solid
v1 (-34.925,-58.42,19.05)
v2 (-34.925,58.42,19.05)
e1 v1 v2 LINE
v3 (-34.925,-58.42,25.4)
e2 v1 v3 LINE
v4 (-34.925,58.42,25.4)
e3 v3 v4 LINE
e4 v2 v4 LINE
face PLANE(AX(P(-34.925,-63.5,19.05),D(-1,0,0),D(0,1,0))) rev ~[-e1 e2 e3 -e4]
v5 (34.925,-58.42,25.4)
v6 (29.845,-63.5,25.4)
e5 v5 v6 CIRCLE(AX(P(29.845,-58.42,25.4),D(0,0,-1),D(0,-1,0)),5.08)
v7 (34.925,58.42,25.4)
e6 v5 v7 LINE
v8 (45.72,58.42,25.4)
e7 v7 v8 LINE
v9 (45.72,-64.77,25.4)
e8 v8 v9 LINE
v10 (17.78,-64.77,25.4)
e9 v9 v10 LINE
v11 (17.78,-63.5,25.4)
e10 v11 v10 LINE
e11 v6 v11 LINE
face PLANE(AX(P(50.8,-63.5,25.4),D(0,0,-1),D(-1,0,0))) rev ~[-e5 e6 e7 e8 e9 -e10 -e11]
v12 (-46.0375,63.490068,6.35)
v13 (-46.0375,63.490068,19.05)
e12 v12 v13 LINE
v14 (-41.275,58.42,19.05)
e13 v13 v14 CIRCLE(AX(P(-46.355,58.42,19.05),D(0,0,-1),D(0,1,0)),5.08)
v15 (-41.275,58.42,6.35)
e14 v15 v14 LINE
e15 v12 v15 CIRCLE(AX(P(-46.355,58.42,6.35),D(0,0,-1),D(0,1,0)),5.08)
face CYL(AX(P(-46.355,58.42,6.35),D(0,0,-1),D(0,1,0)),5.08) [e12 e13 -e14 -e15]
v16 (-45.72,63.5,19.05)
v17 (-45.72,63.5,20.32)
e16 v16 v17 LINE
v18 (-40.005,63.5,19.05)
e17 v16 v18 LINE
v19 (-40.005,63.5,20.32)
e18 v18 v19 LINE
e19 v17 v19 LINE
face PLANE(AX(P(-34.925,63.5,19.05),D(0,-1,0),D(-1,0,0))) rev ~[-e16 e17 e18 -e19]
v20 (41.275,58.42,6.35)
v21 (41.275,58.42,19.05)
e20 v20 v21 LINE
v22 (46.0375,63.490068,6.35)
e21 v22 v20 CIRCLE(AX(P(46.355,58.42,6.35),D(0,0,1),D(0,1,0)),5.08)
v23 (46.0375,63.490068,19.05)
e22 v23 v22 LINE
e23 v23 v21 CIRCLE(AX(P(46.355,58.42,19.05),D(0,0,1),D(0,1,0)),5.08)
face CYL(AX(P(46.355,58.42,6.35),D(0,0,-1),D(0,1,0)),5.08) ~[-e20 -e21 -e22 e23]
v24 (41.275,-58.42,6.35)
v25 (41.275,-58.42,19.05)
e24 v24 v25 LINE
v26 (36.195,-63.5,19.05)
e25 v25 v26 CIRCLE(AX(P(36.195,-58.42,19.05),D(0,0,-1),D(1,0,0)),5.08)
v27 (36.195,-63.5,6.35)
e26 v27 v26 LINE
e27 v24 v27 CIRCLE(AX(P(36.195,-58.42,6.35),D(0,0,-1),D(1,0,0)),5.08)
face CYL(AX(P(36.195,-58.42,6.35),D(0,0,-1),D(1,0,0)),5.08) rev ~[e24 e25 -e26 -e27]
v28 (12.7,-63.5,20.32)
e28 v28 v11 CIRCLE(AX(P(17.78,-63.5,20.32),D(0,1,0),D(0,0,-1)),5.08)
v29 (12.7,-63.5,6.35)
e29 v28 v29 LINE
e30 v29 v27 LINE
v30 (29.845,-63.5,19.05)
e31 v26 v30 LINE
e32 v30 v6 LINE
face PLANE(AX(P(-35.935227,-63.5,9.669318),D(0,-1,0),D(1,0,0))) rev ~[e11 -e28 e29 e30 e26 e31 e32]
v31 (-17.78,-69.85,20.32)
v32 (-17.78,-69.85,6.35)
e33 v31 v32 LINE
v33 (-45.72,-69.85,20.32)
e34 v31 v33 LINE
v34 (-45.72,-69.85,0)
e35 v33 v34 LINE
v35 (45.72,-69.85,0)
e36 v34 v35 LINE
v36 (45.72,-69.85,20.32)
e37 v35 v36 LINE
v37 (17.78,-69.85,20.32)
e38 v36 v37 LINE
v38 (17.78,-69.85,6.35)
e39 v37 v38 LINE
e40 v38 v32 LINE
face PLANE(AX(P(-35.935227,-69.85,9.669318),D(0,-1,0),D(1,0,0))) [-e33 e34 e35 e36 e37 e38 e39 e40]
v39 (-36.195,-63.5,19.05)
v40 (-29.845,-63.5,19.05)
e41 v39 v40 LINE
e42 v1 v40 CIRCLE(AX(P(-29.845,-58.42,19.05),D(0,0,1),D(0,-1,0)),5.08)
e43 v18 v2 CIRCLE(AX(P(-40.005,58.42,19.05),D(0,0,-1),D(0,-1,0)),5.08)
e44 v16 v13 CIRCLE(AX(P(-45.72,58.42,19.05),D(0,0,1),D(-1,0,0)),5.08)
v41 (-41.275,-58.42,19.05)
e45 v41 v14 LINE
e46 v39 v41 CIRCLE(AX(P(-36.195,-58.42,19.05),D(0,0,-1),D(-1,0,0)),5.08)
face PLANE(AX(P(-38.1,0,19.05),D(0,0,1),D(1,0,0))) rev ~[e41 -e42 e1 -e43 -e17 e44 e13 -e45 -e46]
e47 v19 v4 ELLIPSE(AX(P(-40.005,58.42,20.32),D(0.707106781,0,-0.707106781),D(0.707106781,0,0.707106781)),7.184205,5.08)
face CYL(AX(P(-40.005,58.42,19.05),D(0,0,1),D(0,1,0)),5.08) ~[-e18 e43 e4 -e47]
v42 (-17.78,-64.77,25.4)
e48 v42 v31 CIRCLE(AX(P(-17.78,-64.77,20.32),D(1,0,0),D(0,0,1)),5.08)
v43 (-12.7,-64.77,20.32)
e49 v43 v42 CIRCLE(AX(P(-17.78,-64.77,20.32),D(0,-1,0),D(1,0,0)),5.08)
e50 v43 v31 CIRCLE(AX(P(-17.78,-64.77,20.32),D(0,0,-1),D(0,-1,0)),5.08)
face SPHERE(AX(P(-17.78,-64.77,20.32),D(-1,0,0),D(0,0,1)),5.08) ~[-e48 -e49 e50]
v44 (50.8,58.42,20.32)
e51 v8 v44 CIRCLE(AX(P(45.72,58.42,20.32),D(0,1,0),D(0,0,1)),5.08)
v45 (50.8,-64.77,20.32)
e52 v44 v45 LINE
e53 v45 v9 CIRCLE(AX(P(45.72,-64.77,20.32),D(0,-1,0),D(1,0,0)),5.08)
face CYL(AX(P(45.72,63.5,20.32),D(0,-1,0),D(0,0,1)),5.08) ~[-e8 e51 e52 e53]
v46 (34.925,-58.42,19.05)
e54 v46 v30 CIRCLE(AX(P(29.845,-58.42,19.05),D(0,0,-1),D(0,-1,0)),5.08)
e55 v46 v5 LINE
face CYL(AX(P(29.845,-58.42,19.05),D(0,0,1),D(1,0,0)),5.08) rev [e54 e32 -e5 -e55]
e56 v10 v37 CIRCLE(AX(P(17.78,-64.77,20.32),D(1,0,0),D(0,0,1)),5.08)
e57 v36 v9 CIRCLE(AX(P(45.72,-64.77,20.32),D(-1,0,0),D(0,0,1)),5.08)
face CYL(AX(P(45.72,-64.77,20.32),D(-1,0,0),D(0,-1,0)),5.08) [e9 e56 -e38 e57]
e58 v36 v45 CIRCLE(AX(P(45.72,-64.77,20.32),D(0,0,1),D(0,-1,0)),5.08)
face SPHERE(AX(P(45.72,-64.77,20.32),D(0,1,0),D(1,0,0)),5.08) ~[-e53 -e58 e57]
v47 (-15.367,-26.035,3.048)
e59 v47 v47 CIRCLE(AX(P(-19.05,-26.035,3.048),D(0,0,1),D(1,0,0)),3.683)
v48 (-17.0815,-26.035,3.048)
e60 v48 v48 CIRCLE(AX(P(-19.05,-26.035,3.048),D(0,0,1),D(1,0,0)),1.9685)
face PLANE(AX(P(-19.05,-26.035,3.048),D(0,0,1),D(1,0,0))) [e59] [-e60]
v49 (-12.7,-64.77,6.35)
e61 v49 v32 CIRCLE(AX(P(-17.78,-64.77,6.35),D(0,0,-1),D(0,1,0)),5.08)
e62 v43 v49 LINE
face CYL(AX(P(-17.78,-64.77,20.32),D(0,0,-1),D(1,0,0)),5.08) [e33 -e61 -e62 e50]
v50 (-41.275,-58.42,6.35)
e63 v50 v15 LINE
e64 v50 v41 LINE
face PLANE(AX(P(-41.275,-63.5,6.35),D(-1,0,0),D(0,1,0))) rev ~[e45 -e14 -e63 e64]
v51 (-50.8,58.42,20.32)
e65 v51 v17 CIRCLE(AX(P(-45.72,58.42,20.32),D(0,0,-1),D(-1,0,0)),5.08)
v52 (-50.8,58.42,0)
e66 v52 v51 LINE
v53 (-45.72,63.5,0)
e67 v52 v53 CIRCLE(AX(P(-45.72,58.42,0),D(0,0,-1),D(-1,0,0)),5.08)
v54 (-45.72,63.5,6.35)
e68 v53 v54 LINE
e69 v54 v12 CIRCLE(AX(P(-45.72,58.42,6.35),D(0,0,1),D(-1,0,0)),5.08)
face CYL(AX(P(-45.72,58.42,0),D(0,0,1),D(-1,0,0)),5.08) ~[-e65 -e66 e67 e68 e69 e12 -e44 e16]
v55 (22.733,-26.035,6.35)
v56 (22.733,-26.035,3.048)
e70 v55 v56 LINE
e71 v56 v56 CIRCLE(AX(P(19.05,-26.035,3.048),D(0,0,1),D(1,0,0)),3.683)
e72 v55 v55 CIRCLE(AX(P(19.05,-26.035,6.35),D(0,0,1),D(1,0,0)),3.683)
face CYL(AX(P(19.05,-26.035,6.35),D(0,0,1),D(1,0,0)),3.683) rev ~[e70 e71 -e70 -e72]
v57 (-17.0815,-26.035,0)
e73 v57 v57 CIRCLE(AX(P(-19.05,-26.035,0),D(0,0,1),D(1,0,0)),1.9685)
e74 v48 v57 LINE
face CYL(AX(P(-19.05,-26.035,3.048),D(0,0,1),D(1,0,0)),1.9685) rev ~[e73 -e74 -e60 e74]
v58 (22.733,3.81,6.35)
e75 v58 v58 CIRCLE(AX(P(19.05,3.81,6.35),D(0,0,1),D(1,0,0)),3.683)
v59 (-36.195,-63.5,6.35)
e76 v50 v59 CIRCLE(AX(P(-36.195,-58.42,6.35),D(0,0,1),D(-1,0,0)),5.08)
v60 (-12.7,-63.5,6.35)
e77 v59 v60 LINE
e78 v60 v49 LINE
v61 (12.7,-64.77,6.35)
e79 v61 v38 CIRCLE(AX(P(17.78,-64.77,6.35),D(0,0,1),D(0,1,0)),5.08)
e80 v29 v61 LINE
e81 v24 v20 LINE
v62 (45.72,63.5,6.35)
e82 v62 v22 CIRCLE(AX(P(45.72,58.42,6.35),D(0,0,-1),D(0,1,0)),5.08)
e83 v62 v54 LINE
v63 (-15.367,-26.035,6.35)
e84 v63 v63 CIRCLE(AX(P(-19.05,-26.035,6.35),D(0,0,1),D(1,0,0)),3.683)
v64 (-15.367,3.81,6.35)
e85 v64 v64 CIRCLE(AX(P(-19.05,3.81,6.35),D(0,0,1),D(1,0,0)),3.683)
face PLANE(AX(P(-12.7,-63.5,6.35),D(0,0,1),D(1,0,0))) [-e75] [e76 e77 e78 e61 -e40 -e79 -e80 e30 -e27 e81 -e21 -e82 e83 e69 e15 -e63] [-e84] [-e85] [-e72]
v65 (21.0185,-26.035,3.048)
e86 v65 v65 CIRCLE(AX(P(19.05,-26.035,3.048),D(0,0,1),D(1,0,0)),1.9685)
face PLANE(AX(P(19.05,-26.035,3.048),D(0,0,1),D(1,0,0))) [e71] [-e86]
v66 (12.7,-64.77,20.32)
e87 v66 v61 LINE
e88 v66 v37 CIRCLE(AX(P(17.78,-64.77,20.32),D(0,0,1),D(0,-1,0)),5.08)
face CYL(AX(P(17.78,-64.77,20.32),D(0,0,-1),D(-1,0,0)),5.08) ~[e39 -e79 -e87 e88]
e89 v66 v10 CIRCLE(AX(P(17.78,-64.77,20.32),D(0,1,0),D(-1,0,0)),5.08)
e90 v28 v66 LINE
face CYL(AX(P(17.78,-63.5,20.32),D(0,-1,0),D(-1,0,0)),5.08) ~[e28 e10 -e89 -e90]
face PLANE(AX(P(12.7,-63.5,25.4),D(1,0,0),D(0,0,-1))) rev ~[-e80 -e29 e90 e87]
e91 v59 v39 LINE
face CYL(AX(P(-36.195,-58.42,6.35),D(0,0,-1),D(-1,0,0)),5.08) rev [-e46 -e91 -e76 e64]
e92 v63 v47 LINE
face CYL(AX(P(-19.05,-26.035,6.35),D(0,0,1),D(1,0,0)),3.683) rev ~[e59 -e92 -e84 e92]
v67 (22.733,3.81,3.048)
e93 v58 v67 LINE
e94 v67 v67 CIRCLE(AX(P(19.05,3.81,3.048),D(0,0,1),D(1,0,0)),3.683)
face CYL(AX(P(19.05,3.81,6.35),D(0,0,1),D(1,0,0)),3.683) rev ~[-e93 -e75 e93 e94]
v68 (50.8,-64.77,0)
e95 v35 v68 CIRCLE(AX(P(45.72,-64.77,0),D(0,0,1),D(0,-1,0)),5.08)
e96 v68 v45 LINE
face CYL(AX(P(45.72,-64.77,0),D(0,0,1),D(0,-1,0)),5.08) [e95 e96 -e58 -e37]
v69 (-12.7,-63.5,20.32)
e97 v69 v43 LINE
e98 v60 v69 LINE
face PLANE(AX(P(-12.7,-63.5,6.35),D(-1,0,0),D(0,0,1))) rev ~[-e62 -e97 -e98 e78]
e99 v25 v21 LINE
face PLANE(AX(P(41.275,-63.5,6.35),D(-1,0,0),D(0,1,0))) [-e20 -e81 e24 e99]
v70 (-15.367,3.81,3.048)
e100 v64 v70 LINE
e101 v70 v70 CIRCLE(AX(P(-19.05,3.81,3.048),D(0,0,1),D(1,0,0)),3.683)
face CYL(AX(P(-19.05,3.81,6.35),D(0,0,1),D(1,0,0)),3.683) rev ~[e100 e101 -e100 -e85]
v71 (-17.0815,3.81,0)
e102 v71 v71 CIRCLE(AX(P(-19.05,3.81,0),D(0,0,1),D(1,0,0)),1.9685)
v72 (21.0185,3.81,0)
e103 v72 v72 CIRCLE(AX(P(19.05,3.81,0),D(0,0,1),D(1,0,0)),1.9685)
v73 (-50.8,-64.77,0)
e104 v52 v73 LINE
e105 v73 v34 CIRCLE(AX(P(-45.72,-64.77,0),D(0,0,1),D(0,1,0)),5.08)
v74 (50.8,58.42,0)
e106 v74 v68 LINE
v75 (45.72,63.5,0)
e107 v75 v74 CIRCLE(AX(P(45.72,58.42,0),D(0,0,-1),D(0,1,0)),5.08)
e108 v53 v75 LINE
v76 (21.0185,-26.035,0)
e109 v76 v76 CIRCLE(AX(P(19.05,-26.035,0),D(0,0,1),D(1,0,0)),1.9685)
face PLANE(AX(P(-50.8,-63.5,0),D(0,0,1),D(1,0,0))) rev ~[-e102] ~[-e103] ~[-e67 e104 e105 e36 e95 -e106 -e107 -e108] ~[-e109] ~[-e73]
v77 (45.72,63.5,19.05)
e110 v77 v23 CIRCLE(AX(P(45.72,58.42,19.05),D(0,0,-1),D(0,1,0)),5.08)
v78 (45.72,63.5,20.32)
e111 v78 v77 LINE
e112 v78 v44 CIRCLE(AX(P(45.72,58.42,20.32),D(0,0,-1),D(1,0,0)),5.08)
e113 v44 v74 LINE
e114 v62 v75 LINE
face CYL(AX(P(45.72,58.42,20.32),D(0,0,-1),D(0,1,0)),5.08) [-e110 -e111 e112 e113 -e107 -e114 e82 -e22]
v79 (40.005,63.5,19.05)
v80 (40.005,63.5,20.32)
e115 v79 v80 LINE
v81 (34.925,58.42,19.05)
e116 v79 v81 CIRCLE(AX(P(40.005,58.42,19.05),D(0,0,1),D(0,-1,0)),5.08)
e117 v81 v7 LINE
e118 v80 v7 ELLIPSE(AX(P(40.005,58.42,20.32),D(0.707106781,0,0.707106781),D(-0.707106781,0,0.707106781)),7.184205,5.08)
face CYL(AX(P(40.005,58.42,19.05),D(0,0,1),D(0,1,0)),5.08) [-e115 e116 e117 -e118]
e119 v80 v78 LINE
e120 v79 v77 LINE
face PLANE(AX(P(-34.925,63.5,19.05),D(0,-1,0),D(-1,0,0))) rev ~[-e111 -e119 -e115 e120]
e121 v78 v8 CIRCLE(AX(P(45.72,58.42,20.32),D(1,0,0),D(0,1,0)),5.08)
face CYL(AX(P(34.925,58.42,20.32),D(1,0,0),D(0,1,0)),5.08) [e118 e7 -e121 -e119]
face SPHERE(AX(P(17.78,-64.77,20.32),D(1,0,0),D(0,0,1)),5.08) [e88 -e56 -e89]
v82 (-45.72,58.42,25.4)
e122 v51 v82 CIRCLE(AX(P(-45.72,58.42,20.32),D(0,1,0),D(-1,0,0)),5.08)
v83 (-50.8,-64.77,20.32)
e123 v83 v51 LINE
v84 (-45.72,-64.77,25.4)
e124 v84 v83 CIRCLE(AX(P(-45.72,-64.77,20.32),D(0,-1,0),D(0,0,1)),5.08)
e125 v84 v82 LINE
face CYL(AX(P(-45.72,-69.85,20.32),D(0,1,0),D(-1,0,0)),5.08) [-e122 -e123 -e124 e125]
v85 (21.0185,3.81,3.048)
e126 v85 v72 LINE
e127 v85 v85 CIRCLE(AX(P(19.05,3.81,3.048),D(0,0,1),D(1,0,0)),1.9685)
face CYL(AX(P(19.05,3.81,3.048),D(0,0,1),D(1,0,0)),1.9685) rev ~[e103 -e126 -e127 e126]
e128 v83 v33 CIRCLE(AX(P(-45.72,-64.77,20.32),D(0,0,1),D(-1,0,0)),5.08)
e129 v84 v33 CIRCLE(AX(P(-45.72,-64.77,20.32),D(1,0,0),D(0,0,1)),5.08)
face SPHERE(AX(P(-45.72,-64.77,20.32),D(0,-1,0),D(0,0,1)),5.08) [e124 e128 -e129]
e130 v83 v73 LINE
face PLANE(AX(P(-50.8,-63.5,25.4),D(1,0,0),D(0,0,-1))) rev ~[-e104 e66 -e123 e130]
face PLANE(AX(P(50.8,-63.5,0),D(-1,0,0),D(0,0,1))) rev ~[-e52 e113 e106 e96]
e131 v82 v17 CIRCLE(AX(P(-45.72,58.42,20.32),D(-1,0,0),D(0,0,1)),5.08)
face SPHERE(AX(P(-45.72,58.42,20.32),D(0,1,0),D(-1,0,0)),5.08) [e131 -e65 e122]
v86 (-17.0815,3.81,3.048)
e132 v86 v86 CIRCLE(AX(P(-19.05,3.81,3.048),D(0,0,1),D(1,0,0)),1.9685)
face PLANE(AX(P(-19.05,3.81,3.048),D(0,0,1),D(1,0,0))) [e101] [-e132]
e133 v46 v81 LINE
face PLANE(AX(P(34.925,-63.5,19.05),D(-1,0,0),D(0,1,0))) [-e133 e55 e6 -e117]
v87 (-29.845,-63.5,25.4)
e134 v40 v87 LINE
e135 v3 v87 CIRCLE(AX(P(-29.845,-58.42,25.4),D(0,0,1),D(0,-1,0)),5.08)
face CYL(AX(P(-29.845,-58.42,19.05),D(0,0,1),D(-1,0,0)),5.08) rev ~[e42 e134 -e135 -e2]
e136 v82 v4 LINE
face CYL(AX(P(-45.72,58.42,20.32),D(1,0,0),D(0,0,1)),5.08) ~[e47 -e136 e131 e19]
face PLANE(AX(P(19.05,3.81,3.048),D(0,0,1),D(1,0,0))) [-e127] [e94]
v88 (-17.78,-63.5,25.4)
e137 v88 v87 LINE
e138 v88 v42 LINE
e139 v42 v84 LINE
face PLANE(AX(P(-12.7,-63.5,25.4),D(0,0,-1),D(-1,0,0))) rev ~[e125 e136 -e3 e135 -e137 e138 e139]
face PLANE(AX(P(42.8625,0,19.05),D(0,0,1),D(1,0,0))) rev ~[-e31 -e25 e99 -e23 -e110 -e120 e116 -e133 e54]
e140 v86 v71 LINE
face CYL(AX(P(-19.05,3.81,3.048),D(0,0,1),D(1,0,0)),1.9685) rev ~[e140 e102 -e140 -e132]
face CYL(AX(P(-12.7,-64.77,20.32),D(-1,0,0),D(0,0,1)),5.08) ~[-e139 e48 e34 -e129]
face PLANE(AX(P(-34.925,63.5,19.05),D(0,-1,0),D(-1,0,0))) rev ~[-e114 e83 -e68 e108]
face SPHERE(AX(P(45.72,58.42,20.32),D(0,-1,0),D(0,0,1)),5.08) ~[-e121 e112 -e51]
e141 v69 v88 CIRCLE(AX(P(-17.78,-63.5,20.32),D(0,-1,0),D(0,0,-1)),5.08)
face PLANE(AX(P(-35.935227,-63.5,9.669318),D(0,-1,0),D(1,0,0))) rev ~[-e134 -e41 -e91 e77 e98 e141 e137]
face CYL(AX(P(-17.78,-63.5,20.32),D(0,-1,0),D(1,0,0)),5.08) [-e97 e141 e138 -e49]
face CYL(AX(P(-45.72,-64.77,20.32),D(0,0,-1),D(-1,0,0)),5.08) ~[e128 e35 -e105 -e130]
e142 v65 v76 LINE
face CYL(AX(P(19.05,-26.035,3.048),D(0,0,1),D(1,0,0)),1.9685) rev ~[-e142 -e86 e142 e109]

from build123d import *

# Parameters (mm, degrees)
F0_W          = 101.6
F0_H          = 127
F1_DEPTH      = 6.35
F2_W          = 9.525
F2_H          = 127
F3_DEPTH      = 12.7
F4_W          = 6.35
F4_H          = 127
F4_W_2        = 9.525
F4_W_3        = 15.875
F5_DEPTH      = 6.35
F6_R          = 3.683
F7_DEPTH      = 3.302
F8_R          = 1.9685
F9_DEPTH      = 25.4
F10_W         = 25.4
F10_H         = 6.35
F11_DEPTH     = 6.35
F12_R         = 5.08
F13_R         = 5.08
F14_T4_DEPTH  = 25.4
F14_T9_DEPTH  = 25.4
F14_T11_DEPTH = 12.7
F15_R         = 5.08


# Not quite as in the source:
# - a fillet or chamfer that OpenCascade refuses, or shapes differently, is made with other operations: its cross-section is extruded or revolved along the edge and cut away or added


with BuildPart() as f1:
    # F0 (on Top) → F1 (new body)
    with BuildSketch(Plane.XY):
        Rectangle(F0_W, F0_H)
    extrude(amount=F1_DEPTH)

    # F2 (on face) → F3 (join)
    with BuildSketch(Plane.XY.offset(6.35)):
        with Locations((-46.0375, 0)):
            Rectangle(F2_W, F2_H)
        with Locations((46.0375, 0)):
            Rectangle(F2_W, F2_H)
    extrude(amount=F3_DEPTH)

    # F4 (on face) → F5 (join)
    with BuildSketch(Plane.XY.offset(19.05)):
        with Locations((-38.1, 0)):
            Rectangle(F4_W, F4_H)
        with Locations((-46.0375, 0)):
            Rectangle(F4_W_2, F4_H)
        with Locations((42.8625, 0)):
            Rectangle(F4_W_3, F4_H)
    extrude(amount=F5_DEPTH)

    # F6 (on face) → F7 (cut)
    with BuildSketch(Plane.XY.offset(6.35)):
        with Locations((-19.05, 3.81)):
            Circle(F6_R)
        with Locations((-19.05, -26.035)):
            Circle(F6_R)
        with Locations((19.05, -26.035)):
            Circle(F6_R)
        with Locations((19.05, 3.81)):
            Circle(F6_R)
    extrude(amount=-F7_DEPTH, mode=Mode.SUBTRACT)

    # F8 (on face) → F9 (cut)
    with BuildSketch(Plane.XY.offset(3.048)):
        with Locations((-19.05, 3.81)):
            Circle(F8_R)
        with Locations((19.05, 3.81)):
            Circle(F8_R)
        with Locations((-19.05, -26.035)):
            Circle(F8_R)
        with Locations((19.05, -26.035)):
            Circle(F8_R)
    extrude(amount=-F9_DEPTH, mode=Mode.SUBTRACT)

    # F10 (on face) → F11 (join)
    with BuildSketch(Plane.XZ.offset(63.5)):
        Polygon((-34.925, 25.4), (-50.8, 25.4), (-50.8, 0), (-12.7, 0), (-12.7, 6.35), (-41.275, 6.35), (-41.275, 19.05), (-34.925, 19.05), align=None)
        Polygon((-12.7, 25.4), (-34.925, 25.4), (-34.925, 19.05), (-41.275, 19.05), (-41.275, 6.35), (-12.7, 6.35), align=None)
        Polygon((34.925, 25.4), (12.7, 25.4), (12.7, 6.35), (41.275, 6.35), (41.275, 19.05), (34.925, 19.05), align=None)
        Polygon((12.7, 6.35), (12.7, 0), (50.8, 0), (50.8, 25.4), (34.925, 25.4), (34.925, 19.05), (41.275, 19.05), (41.275, 6.35), align=None)
        with Locations((0, 3.175)):
            Rectangle(F10_W, F10_H)
    extrude(amount=F11_DEPTH)

    # F12
    f12_edges = [f1.edges().sort_by_distance(p)[0] for p in [
        (-50.8, -3.175, 25.4),
        (50.8, -3.175, 25.4),
    ]]
    fillet(f12_edges, radius=F12_R)

    # F13
    f13_edges = [f1.edges().sort_by_distance(p)[0] for p in [
        (-34.925, 63.5, 22.225),
        (34.925, 63.5, 22.225),
        (-50.8, 63.5, 10.16),
        (50.8, 63.5, 10.16),
        (-50.8, -69.85, 10.16),
        (50.8, -69.85, 10.16),
        (-34.925, -63.5, 22.225),
        (34.925, -63.5, 22.225),
    ]]
    fillet(f13_edges, radius=F13_R)

    # F14: fillet of radius 5.08 on 4 edges, made by hand


with BuildPart() as f14_tool2:
    # F14_s3 → F14_t4 (new body)
    with BuildSketch(Plane.XY.offset(6.35)):
        with BuildLine():
            ThreePointArc((-41.275, -58.42), (-39.7871024484, -62.0121024484), (-36.195, -63.5))
            Line((-36.195, -63.5), (-41.275, -63.5))
            Line((-41.275, -63.5), (-41.275, -58.42))
        make_face()
    extrude(amount=F14_T4_DEPTH)

    split(bisect_by=Plane.XY.offset(25.4), keep=Keep.BOTTOM)


with BuildPart() as f1_1:
    add(f1.part)

    # F14_t1: union F14_tool2
    add(f14_tool2.part)


with BuildPart() as f14_tool7:
    # F14_s8 → F14_t9 (new body)
    with BuildSketch(Plane.XY.offset(6.35)):
        with BuildLine():
            ThreePointArc((41.275, -58.42), (39.7871024484, -62.0121024484), (36.195, -63.5))
            Line((36.195, -63.5), (41.275, -63.5))
            Line((41.275, -63.5), (41.275, -58.42))
        make_face()
    extrude(amount=F14_T9_DEPTH)

    split(bisect_by=Plane.XY.offset(25.4), keep=Keep.BOTTOM)


with BuildPart() as f1_2:
    add(f1_1.part)

    # F14_t6: union F14_tool7
    add(f14_tool7.part)

    # F14_s12 → F14_t11 (cut)
    with BuildSketch(Plane.XY.offset(6.35)):
        with BuildLine():
            ThreePointArc((-46.355, 63.5), (-42.7628975516, 62.0121024484), (-41.275, 58.42))
            Line((-41.275, 58.42), (-41.275, 63.5))
            Line((-41.275, 63.5), (-46.355, 63.5))
        make_face()
        with BuildLine():
            ThreePointArc((46.355, 63.5), (42.7628975516, 62.0121024484), (41.275, 58.42))
            Line((41.275, 58.42), (41.275, 63.5))
            Line((41.275, 63.5), (46.355, 63.5))
        make_face()
    extrude(amount=F14_T11_DEPTH, mode=Mode.SUBTRACT)

    # F15
    f15_edges = [f1_2.edges().sort_by_distance(p)[0] for p in [
        (-12.7, -64.135, 25.4),
        (12.7, -64.135, 25.4),
        (-12.7, -69.85, 13.335),
        (12.7, -69.85, 13.335),
        (12.7, -68.362102, 23.912102),
        (-12.7, -68.362102, 23.912102),
    ]]
    fillet(f15_edges, radius=F15_R)


solid = f1_2.part
